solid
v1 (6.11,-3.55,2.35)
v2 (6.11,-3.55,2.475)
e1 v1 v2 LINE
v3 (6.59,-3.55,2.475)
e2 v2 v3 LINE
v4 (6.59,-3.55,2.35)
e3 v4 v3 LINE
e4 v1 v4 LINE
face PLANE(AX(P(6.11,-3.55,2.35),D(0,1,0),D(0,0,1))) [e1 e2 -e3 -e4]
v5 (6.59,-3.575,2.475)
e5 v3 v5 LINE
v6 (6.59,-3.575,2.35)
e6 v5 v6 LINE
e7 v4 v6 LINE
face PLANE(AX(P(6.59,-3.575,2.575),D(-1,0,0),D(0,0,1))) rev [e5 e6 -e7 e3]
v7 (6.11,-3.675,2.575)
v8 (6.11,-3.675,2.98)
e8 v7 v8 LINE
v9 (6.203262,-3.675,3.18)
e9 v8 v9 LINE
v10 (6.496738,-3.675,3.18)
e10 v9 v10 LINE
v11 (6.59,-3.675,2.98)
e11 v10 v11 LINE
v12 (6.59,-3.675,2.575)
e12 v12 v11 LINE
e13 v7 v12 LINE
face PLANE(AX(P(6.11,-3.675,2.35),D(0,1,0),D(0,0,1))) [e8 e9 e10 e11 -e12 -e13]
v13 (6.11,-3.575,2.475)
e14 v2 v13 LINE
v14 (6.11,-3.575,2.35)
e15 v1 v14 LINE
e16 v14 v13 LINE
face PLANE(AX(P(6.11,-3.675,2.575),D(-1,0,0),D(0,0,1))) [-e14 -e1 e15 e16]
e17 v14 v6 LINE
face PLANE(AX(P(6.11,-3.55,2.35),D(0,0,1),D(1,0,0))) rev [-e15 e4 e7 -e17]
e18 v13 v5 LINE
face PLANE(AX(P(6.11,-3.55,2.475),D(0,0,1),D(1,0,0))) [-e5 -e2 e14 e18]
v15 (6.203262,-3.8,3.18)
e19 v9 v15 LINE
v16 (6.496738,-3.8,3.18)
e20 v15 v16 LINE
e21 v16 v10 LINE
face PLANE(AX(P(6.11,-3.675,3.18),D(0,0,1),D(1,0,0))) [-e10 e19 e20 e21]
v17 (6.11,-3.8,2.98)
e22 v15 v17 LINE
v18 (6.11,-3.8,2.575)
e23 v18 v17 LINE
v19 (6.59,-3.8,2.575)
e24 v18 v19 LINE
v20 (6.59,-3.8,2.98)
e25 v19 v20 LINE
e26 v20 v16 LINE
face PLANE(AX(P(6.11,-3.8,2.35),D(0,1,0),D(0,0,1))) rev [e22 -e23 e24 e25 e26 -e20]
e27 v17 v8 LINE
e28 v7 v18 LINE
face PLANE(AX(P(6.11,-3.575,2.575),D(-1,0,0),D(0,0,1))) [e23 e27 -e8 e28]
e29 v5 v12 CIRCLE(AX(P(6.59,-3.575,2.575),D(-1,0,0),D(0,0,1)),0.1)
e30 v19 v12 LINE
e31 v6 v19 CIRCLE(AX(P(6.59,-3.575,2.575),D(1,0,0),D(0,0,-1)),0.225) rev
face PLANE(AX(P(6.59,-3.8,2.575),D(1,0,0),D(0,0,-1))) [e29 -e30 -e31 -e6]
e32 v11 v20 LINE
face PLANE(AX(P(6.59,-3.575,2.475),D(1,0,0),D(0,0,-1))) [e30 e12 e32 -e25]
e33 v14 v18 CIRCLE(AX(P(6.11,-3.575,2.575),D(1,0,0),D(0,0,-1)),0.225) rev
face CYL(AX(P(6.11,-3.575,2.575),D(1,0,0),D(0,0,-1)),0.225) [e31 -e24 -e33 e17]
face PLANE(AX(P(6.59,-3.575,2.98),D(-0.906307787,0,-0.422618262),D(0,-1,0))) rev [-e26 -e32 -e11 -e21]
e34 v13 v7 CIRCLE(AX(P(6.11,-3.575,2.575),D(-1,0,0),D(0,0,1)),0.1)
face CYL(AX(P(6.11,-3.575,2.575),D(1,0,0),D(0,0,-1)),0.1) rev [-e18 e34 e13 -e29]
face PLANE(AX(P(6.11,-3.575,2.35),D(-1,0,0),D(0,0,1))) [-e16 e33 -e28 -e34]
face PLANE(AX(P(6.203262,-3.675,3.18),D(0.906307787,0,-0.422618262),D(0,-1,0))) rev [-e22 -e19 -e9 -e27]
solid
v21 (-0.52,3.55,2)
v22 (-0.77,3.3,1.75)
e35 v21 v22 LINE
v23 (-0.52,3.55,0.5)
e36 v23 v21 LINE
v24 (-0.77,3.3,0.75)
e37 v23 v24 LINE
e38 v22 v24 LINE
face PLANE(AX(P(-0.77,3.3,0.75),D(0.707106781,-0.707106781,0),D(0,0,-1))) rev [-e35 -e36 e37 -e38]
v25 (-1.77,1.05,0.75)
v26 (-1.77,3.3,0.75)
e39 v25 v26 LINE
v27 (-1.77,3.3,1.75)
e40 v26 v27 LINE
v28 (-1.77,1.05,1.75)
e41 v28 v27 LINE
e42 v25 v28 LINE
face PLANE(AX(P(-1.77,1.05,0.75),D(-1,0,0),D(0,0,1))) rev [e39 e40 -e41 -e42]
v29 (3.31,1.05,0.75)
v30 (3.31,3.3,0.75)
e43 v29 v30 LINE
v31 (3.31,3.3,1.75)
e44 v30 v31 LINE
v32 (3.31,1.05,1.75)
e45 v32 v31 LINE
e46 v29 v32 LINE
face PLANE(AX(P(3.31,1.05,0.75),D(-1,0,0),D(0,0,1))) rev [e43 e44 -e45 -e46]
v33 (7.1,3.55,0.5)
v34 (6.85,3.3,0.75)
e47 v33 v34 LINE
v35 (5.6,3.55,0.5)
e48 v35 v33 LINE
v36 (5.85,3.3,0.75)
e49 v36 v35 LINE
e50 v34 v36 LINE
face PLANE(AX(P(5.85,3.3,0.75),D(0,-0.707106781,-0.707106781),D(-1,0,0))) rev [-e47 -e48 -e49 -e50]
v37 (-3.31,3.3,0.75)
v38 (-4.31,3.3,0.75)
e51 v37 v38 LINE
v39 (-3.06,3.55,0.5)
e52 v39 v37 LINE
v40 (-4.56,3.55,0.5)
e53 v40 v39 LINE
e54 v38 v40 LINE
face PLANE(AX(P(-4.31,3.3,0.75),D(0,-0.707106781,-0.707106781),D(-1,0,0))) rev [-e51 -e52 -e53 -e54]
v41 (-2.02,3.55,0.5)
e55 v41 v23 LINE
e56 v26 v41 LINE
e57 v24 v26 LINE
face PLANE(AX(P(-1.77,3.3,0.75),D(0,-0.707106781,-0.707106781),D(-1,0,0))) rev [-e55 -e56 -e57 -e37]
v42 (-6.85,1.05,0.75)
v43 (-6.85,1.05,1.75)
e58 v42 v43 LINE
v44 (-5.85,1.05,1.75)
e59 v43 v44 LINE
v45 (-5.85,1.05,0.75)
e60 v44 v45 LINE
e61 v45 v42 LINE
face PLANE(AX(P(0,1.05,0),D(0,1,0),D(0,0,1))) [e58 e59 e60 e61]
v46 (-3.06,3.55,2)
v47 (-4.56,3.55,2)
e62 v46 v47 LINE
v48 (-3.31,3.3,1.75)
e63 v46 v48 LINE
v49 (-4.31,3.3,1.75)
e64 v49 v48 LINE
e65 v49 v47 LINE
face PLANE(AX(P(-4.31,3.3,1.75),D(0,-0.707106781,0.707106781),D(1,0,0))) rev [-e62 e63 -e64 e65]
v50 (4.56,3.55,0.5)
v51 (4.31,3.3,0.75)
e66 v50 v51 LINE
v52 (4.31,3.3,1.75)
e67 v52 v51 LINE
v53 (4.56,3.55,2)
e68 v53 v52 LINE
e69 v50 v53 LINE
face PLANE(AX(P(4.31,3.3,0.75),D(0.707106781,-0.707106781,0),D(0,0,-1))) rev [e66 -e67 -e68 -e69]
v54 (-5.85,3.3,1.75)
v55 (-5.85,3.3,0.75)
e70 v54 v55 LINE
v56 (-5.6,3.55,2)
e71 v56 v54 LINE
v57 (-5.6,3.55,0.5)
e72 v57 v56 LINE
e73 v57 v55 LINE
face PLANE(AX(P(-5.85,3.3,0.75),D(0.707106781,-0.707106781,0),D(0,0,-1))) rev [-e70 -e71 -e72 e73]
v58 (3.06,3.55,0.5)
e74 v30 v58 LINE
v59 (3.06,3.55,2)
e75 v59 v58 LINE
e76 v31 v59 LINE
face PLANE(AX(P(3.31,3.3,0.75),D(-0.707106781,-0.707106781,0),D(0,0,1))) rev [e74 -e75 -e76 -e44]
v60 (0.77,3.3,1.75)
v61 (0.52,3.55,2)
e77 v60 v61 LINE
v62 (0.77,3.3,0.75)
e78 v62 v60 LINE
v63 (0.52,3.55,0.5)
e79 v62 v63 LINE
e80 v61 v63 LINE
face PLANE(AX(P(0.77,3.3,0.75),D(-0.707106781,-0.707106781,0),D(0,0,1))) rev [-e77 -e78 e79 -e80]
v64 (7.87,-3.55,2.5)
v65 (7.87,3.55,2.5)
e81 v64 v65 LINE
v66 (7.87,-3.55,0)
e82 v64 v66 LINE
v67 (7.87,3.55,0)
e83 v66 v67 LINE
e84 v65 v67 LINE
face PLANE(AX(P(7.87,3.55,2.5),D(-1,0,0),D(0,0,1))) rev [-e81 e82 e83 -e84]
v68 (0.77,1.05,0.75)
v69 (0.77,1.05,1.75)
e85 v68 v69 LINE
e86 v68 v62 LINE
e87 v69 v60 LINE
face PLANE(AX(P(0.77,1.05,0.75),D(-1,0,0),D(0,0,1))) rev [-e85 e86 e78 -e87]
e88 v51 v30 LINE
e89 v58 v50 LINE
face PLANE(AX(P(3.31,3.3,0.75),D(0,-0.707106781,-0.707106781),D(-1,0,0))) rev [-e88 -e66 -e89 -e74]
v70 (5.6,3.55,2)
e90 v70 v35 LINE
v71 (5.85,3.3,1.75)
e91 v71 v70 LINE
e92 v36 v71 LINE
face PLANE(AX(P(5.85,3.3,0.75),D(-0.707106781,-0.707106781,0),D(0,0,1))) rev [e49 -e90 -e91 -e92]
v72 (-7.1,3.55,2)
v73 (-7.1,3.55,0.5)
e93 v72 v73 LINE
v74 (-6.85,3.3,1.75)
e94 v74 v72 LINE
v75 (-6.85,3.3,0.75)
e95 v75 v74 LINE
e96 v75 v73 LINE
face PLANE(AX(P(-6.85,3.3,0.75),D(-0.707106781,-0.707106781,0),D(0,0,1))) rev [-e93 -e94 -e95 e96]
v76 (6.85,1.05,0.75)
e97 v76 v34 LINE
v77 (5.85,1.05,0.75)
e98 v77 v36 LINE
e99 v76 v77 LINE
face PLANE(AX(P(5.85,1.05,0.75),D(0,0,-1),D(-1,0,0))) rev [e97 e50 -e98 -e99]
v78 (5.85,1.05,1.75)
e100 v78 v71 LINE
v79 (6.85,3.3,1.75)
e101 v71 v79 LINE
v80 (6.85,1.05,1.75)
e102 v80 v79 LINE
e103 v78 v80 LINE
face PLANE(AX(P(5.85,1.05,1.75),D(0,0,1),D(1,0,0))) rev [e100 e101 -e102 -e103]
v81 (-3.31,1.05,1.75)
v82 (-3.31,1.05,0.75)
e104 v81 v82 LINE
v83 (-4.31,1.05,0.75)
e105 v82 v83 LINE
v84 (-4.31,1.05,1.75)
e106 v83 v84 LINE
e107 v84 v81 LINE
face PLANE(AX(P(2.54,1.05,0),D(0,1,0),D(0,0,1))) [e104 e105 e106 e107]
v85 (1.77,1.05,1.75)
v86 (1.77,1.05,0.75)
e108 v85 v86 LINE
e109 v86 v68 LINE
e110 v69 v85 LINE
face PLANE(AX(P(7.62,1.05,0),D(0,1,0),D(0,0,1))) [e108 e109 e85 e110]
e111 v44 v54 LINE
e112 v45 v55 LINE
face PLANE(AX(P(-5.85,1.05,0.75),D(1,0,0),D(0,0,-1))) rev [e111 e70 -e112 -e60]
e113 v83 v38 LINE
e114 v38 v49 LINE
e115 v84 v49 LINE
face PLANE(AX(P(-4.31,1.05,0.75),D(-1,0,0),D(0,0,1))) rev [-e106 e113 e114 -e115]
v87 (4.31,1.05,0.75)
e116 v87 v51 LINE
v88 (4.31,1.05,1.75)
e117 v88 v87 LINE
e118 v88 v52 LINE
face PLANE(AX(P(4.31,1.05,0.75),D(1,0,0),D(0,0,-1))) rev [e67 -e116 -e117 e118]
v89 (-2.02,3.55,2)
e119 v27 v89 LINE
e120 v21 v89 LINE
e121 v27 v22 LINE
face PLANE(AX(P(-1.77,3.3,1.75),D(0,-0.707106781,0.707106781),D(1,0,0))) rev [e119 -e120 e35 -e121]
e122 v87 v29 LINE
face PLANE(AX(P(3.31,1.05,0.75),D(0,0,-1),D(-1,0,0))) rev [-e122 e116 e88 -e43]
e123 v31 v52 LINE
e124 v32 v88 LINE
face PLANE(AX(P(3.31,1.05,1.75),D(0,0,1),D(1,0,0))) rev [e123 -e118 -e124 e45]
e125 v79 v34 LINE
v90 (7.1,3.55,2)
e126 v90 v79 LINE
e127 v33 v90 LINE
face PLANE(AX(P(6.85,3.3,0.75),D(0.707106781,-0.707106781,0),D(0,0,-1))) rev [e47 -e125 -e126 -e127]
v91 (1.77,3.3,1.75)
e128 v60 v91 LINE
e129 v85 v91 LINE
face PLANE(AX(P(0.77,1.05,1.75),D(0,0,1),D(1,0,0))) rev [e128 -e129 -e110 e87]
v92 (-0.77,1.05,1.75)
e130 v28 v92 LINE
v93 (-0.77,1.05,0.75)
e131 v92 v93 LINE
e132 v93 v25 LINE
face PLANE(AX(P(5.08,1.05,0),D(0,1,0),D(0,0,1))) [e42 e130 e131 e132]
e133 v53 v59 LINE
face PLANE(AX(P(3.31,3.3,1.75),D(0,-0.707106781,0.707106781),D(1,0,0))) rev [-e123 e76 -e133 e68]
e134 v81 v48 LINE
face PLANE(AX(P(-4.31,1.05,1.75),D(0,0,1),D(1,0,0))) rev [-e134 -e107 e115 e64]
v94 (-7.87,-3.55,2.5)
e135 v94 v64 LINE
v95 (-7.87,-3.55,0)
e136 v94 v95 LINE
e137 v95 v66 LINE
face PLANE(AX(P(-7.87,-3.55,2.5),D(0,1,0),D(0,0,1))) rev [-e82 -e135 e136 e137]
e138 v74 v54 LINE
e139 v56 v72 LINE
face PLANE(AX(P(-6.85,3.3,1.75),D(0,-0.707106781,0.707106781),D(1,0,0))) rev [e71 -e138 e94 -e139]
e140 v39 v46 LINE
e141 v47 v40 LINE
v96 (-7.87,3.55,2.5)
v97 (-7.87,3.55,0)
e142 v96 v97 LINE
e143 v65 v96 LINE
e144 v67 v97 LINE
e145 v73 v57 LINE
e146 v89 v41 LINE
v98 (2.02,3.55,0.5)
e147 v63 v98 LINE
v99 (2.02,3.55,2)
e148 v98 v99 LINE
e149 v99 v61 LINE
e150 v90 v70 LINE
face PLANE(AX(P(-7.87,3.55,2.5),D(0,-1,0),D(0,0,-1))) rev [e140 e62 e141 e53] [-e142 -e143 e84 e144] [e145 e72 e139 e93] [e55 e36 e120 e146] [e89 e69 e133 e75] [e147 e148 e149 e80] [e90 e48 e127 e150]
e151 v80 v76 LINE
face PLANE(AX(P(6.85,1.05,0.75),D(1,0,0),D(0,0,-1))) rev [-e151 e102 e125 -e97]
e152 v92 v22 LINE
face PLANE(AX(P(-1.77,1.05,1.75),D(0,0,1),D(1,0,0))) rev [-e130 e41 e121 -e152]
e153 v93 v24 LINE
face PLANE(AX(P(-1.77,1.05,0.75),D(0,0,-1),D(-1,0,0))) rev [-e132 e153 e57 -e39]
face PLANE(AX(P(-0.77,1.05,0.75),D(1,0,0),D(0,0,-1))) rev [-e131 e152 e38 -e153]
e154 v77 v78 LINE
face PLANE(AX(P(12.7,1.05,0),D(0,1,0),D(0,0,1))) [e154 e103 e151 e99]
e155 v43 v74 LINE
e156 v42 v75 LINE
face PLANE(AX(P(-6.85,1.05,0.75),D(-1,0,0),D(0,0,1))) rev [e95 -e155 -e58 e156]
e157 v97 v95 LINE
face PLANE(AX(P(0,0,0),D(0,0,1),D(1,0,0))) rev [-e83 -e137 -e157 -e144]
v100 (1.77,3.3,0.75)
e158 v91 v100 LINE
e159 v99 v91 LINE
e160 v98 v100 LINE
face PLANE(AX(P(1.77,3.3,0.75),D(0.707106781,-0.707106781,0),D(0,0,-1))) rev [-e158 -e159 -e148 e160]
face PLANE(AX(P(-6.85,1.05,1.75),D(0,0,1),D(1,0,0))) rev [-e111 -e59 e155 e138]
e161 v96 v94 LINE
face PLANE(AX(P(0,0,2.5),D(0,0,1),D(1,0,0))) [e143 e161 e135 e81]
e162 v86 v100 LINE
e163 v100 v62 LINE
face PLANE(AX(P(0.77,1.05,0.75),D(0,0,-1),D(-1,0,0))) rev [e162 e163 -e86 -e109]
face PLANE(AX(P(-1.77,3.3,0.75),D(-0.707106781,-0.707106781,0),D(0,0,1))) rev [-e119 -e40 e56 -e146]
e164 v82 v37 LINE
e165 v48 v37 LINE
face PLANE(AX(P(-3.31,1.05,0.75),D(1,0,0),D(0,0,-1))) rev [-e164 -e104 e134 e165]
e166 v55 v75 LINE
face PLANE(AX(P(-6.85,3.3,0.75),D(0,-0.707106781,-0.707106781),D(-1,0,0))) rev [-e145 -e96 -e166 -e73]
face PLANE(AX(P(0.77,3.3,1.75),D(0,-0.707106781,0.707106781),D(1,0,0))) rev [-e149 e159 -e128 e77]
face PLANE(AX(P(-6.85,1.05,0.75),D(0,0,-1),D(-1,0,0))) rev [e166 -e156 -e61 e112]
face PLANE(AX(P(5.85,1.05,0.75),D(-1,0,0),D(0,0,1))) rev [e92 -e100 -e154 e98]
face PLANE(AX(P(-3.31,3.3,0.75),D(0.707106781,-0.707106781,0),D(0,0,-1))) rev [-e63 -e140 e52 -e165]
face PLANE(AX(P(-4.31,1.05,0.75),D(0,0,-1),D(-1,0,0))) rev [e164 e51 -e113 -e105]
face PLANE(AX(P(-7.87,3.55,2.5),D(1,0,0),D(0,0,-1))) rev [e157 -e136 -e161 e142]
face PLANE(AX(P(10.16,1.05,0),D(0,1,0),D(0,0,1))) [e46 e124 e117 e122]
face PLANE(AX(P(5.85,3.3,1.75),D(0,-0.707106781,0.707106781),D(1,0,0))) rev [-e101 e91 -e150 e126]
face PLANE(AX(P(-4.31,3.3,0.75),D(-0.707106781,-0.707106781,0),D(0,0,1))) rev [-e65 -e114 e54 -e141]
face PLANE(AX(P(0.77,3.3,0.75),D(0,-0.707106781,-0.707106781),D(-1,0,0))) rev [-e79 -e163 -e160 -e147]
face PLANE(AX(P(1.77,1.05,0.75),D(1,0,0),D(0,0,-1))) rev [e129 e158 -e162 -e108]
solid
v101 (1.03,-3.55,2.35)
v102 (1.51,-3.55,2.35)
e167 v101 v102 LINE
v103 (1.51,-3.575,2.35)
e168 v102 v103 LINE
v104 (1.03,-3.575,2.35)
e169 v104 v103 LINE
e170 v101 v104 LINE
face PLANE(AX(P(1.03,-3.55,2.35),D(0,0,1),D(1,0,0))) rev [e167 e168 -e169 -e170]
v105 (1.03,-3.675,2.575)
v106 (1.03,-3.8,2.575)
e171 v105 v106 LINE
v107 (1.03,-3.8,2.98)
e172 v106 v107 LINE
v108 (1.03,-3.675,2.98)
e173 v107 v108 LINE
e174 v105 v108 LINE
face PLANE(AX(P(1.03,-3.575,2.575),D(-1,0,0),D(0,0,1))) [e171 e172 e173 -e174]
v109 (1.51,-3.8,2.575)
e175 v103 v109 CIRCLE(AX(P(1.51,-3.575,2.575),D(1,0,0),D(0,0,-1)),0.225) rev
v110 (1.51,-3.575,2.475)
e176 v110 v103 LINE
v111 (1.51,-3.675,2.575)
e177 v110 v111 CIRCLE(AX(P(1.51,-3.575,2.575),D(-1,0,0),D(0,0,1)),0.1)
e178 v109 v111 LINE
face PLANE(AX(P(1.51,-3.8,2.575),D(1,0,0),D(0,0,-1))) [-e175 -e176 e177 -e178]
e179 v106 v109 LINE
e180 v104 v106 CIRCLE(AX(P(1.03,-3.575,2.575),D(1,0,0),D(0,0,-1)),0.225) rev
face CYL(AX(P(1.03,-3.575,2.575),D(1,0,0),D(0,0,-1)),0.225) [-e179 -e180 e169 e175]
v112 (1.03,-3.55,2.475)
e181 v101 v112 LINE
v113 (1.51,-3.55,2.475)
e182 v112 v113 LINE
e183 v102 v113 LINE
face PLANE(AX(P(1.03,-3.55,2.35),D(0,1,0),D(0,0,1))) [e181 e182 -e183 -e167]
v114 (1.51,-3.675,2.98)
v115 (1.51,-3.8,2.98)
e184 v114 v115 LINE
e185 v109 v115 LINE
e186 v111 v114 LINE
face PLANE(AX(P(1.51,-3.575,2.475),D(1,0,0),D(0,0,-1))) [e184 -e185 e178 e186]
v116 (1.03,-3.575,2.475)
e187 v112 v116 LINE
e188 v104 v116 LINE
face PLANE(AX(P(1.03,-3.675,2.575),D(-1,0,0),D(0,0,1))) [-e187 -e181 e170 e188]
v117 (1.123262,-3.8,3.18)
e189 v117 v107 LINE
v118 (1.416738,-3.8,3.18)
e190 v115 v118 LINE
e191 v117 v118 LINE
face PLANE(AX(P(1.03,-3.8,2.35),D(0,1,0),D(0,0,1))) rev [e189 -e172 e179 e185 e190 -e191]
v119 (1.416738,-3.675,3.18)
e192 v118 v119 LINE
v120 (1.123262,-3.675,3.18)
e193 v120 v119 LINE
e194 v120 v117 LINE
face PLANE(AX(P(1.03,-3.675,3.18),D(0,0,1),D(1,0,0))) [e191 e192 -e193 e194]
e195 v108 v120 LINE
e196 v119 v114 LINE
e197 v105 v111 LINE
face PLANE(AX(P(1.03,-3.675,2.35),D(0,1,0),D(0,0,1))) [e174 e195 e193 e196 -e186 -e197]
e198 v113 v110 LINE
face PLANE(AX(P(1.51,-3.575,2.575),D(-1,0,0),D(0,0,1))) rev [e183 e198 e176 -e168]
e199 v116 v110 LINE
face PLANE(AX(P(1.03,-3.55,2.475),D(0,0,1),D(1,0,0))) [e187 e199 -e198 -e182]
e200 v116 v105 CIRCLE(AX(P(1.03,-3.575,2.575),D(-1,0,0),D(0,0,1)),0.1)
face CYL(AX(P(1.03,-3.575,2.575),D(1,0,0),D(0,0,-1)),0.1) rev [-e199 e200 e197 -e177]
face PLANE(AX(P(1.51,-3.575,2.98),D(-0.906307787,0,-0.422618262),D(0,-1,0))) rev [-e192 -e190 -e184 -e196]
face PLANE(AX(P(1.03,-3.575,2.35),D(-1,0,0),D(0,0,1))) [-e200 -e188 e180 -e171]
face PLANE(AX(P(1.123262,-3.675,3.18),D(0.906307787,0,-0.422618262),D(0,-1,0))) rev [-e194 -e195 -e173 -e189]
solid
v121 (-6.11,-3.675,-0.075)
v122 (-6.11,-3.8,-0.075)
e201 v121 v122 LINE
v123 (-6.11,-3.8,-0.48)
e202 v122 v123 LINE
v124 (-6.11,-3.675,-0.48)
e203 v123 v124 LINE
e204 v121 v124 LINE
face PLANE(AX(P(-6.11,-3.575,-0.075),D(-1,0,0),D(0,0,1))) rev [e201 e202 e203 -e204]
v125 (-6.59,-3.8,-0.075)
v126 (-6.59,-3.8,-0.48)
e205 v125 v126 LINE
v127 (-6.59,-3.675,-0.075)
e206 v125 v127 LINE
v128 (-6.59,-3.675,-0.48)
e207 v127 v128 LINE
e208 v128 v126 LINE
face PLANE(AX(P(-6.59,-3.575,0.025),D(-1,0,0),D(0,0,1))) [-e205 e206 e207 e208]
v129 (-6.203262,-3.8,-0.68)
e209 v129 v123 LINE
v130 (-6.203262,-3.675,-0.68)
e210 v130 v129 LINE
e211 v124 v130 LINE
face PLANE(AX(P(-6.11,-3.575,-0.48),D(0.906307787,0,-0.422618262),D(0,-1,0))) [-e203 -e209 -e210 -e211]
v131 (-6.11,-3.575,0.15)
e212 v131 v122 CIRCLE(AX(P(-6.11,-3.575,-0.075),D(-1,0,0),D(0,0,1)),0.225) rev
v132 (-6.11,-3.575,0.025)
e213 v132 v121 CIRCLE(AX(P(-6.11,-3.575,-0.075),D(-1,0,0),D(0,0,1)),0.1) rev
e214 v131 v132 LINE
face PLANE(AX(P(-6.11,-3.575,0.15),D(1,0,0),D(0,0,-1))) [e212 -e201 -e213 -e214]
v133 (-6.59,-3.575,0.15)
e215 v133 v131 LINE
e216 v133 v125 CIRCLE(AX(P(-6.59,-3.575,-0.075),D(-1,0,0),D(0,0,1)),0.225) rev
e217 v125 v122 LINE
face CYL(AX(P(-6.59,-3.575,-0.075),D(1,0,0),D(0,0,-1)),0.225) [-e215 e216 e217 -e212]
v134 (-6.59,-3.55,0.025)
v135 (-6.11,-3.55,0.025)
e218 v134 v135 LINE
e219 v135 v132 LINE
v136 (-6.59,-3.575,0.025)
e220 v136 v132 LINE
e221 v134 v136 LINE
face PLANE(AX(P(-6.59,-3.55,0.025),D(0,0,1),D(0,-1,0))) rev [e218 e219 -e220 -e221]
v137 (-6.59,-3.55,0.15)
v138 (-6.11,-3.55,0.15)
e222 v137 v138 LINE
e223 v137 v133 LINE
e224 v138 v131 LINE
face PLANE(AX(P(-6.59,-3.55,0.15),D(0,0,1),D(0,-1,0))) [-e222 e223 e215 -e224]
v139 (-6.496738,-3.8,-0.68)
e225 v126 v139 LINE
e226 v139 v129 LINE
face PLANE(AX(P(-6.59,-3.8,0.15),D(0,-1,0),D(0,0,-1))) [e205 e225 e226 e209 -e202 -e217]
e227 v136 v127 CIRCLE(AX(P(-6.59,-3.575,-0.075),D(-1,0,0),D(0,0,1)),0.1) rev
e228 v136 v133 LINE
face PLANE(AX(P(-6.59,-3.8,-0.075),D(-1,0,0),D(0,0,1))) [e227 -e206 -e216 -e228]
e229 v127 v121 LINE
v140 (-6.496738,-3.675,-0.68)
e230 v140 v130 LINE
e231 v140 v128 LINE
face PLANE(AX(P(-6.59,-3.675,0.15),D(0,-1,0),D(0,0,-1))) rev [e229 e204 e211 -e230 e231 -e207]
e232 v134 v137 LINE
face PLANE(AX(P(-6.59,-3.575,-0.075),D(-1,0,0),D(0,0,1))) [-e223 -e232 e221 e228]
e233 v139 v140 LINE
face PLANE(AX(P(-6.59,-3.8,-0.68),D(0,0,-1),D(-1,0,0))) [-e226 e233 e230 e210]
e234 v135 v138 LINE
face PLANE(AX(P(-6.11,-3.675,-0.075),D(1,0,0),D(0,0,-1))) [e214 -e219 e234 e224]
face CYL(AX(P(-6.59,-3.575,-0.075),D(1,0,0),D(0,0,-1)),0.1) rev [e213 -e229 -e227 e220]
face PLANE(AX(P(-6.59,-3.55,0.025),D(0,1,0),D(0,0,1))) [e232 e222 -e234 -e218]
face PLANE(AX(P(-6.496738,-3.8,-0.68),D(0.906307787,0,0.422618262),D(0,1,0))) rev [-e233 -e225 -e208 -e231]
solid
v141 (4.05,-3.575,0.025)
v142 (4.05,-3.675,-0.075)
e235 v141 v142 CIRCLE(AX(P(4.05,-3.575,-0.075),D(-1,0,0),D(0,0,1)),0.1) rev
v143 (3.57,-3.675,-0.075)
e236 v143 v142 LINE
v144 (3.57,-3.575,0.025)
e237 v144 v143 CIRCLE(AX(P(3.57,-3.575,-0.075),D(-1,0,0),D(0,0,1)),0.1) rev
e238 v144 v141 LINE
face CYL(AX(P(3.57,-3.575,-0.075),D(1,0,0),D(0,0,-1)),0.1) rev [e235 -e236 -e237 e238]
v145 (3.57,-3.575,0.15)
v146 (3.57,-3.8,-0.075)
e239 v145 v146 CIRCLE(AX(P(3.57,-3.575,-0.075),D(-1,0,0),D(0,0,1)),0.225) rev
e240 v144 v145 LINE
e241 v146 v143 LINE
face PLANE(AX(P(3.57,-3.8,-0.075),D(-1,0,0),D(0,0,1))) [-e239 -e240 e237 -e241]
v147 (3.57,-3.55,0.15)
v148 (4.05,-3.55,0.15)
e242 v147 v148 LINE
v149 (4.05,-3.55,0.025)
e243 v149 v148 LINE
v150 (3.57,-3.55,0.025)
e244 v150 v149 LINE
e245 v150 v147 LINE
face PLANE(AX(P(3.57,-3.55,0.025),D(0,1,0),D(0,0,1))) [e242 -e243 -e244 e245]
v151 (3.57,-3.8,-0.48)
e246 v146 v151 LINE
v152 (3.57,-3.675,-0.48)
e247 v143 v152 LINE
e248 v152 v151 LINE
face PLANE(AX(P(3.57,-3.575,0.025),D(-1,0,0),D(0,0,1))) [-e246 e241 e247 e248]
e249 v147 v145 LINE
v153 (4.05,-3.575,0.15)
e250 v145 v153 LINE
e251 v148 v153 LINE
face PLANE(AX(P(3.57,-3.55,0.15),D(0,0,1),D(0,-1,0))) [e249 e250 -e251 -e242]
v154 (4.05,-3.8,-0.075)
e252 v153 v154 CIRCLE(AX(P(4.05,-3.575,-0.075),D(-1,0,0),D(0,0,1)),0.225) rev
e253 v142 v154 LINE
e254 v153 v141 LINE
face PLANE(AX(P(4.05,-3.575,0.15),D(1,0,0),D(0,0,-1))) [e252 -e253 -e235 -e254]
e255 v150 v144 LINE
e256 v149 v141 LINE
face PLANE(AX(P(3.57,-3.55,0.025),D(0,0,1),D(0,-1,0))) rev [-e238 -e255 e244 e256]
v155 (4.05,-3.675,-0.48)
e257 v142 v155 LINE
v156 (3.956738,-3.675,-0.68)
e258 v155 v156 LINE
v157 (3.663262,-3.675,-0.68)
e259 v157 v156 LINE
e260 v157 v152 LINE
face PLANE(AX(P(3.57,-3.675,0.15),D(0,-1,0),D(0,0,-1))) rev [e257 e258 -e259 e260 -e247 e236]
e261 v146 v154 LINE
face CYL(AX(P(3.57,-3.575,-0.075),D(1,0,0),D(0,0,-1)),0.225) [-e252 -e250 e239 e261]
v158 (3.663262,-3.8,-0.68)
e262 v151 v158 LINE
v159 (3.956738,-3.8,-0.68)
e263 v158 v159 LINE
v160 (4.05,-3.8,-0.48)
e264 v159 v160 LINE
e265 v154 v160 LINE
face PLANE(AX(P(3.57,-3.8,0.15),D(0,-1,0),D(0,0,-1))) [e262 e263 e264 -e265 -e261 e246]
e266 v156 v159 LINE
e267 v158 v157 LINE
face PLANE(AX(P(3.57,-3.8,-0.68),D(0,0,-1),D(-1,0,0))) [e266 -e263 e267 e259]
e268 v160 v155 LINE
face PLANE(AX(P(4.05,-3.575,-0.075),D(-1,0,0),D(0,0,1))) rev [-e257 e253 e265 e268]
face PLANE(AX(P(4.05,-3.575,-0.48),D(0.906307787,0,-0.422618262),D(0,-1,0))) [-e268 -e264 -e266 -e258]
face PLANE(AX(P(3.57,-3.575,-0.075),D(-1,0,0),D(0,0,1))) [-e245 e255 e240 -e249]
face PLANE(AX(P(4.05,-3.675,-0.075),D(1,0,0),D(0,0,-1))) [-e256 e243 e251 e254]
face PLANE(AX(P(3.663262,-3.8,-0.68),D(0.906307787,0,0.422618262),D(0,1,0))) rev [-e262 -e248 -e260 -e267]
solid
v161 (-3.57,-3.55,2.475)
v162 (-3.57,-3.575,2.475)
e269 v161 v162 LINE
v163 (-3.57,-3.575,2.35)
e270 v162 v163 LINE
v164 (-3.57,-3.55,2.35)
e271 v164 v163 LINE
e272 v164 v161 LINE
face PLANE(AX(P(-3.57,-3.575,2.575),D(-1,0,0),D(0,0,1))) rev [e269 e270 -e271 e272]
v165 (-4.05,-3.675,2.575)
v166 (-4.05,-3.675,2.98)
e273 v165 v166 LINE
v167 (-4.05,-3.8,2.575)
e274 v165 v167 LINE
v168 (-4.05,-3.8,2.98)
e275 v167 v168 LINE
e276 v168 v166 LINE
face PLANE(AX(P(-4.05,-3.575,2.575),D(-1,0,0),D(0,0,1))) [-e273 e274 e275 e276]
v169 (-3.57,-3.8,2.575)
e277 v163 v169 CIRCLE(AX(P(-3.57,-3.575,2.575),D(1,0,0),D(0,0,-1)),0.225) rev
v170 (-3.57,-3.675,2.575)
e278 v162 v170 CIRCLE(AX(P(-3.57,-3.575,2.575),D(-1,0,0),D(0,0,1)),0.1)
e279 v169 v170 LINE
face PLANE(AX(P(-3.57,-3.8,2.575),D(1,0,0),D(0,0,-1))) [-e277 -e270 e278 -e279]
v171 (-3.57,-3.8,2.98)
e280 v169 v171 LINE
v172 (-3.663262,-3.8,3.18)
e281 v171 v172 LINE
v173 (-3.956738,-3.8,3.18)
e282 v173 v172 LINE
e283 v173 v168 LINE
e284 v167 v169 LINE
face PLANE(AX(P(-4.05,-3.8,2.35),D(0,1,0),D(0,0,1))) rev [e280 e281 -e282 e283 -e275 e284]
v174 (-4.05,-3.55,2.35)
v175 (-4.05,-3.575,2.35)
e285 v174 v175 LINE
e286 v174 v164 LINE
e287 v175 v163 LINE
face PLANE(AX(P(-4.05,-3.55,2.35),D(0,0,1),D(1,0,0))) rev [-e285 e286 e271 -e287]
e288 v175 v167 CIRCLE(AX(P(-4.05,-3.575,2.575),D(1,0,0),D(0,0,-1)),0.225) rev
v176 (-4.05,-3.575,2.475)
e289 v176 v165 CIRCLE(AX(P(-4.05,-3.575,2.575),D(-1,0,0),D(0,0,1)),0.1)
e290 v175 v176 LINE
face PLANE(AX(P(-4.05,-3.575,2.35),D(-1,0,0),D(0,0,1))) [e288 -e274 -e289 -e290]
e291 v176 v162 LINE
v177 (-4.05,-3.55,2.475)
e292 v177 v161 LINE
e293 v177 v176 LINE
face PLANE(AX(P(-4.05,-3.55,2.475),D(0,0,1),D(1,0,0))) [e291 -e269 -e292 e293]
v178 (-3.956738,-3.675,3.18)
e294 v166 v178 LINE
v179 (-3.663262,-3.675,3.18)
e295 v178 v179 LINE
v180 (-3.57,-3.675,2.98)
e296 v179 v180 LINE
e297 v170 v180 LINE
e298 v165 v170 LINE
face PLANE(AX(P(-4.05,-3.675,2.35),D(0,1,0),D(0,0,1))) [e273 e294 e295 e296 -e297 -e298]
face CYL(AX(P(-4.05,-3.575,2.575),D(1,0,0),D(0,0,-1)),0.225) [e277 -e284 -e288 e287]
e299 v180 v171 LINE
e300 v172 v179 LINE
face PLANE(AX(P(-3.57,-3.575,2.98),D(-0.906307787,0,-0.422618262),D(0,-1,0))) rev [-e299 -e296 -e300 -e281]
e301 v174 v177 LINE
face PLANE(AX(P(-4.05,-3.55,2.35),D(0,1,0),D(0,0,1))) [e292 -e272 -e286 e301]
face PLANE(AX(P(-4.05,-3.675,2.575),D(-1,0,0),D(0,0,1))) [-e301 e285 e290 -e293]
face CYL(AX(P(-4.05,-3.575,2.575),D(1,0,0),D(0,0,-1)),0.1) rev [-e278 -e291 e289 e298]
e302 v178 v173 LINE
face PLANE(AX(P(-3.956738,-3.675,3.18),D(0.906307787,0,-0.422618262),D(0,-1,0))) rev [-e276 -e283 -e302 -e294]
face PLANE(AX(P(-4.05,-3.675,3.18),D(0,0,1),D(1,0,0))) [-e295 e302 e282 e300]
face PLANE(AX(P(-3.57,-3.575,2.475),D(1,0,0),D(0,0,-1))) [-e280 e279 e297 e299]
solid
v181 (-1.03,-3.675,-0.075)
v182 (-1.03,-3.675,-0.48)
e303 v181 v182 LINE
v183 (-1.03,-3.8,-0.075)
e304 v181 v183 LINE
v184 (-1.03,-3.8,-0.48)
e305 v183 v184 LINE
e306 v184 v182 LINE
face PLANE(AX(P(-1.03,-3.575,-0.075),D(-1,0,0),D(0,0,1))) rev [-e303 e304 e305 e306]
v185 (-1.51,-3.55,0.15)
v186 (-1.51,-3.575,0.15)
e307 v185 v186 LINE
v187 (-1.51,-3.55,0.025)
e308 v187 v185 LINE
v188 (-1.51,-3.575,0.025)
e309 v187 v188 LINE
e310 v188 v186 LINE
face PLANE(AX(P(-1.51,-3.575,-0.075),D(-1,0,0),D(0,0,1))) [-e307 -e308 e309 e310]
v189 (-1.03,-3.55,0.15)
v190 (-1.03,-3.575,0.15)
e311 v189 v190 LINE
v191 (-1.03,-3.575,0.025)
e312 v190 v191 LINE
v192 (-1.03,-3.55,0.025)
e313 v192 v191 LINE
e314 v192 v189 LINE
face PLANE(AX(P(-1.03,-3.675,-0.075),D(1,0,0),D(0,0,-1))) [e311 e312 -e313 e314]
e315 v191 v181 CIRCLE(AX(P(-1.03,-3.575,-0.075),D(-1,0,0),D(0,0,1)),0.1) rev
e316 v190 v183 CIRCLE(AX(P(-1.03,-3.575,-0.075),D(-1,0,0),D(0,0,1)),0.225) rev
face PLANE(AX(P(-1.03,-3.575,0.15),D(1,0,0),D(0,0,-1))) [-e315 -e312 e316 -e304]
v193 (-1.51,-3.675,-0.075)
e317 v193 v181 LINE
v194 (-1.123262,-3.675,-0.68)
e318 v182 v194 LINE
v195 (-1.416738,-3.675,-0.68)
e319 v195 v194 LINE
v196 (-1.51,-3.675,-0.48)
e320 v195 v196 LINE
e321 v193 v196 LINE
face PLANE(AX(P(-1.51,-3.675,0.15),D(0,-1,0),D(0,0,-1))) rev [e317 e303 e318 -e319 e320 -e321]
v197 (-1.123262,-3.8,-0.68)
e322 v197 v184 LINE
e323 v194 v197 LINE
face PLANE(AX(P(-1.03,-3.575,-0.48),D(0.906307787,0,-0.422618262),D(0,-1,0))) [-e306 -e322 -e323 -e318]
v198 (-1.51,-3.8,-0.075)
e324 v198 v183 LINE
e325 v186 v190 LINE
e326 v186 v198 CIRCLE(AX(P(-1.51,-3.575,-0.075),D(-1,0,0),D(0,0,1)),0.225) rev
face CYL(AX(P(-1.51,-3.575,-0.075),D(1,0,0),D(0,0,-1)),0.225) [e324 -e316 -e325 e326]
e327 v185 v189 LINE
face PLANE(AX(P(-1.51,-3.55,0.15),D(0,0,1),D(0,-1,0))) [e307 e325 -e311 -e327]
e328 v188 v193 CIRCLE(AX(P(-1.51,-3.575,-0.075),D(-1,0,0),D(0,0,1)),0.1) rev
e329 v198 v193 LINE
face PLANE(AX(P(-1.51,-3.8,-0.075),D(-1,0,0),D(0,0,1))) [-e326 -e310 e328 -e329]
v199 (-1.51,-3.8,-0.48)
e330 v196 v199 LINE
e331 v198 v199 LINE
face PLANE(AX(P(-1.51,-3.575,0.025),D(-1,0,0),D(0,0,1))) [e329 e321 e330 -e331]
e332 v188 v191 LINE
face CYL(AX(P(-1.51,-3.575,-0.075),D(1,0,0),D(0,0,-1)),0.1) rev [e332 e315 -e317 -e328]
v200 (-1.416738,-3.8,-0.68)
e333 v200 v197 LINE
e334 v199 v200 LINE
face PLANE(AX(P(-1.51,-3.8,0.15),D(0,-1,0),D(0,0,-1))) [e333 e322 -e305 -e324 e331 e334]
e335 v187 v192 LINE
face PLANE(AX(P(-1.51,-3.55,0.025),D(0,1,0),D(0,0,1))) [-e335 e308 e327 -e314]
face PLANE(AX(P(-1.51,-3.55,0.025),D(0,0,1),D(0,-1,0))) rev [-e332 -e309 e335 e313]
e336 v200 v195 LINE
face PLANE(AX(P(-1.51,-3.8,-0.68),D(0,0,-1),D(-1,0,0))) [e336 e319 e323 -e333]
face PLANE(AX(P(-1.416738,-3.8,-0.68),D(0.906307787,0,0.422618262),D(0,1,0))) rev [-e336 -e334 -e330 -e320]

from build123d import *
from OCP.BRepFilletAPI import BRepFilletAPI_MakeChamfer

# Parameters (mm, degrees)
SKETCH1_W                  = 15.74
SKETCH1_H                  = 7.1
BOSS_EXTRUDE1_DEPTH        = 2.5
SKETCH2_W                  = 1
SKETCH2_H                  = 1
CUT_EXTRUDE1_DEPTH         = 2.5
CHAMFER1_SIZE              = 0.25
LPATTERN6_COUNT            = 6
LPATTERN6_PITCH            = 2.54
CHAMFER1_OF_LPATTERN6_SIZE = 0.25
BASE_FLANGE2_DEPTH         = 0.24
BASE_FLANGE2_DEPTH_BACK    = 0.24
BASE_FLANGE3_DEPTH         = 0.24
BASE_FLANGE3_DEPTH_BACK    = 0.24
CHAMFER3_SIZE              = 0.2
CHAMFER3_SIZE2             = 0.093261532
CHAMFER4_SIZE              = 0.2
CHAMFER4_SIZE2             = 0.093261532
LPATTERN4_COUNT            = 3
LPATTERN4_PITCH            = 5.08
LPATTERN3_COUNT            = 3
LPATTERN3_PITCH            = 5.08


# Sheet-metal steps are written as plain solids
with BuildPart() as part:
    # Sketch1 → Boss-Extrude1 (new body)
    with BuildSketch(Plane.XY):
        Rectangle(SKETCH1_W, SKETCH1_H)
    extrude(amount=BOSS_EXTRUDE1_DEPTH)

    # Sketch2 → Cut-Extrude1 (cut)
    with BuildSketch(Plane(origin=(0, 3.55, 0), x_dir=(1, 0, 0), z_dir=(0, 1, 0))):
        with Locations((-6.35, -1.25)):
            Rectangle(SKETCH2_W, SKETCH2_H)
    cut_extrude1 = extrude(amount=-CUT_EXTRUDE1_DEPTH, mode=Mode.SUBTRACT)

    # Chamfer1
    chamfer1_edges = [part.edges().sort_by_distance(p)[0] for p in [
        (-5.85, 3.55, 1.25),
        (-6.35, 3.55, 0.75),
        (-6.85, 3.55, 1.25),
        (-6.35, 3.55, 1.75),
    ]]
    chamfer(chamfer1_edges, length=CHAMFER1_SIZE)

    # LPattern6: Cut-Extrude1 ×6
    with Locations(*[(i * LPATTERN6_PITCH, 0, 0) for i in range(1, LPATTERN6_COUNT)]):
        add(cut_extrude1, mode=Mode.SUBTRACT)

    # Chamfer1 of LPattern6
    chamfer1_of_lpattern6_edges = [part.edges().sort_by_distance(p)[0] for p in [
        (-3.31, 3.55, 1.25),
        (-3.81, 3.55, 0.75),
        (-4.31, 3.55, 1.25),
        (-3.81, 3.55, 1.75),
        (-0.77, 3.55, 1.25),
        (-1.27, 3.55, 0.75),
        (-1.77, 3.55, 1.25),
        (-1.27, 3.55, 1.75),
        (1.77, 3.55, 1.25),
        (1.27, 3.55, 0.75),
        (0.77, 3.55, 1.25),
        (1.27, 3.55, 1.75),
        (4.31, 3.55, 1.25),
        (3.81, 3.55, 0.75),
        (3.31, 3.55, 1.25),
        (3.81, 3.55, 1.75),
        (6.85, 3.55, 1.25),
        (6.35, 3.55, 0.75),
        (5.85, 3.55, 1.25),
        (6.35, 3.55, 1.75),
    ]]
    chamfer(chamfer1_of_lpattern6_edges, length=CHAMFER1_OF_LPATTERN6_SIZE)


with BuildPart() as body_2:
    # Sketch5 → Base-Flange2 (new, two sides: drawn at the far end of the back side and taken through both)
    with BuildSketch(Plane.ZY.offset(6.35).offset(-BASE_FLANGE2_DEPTH_BACK)):
        with BuildLine():
            Line((0.15, -3.55), (0.15, -3.575))
            ThreePointArc((0.15, -3.575), (0.084099026, -3.734099026), (-0.075, -3.8))
            Line((-0.075, -3.8), (-0.68, -3.8))
            Line((-0.68, -3.8), (-0.68, -3.675))
            Line((-0.68, -3.675), (-0.075, -3.675))
            ThreePointArc((-0.075, -3.675), (-0.004289322, -3.645710678), (0.025, -3.575))
            Line((0.025, -3.575), (0.025, -3.55))
            Line((0.025, -3.55), (0.15, -3.55))
        make_face()
    extrude(amount=BASE_FLANGE2_DEPTH + BASE_FLANGE2_DEPTH_BACK)

    # Chamfer4: one chamfer whose edges measure the first distance from different faces: ONE call of the kernel's chamfer builder (chamfer() names one face for all edges)
    chamfer4_edges_1 = [body_2.edges().sort_by_distance(p)[0] for p in [
        (-6.11, -3.7375, -0.68),
    ]]
    chamfer4_side_1 = [body_2.faces().sort_by_distance(p)[0] for p in [
        (-6.11, -3.717002494, -0.245845427),
    ]]
    chamfer4_edges_2 = [body_2.edges().sort_by_distance(p)[0] for p in [
        (-6.59, -3.7375, -0.68),
    ]]
    chamfer4_side_2 = [body_2.faces().sort_by_distance(p)[0] for p in [
        (-6.59, -3.717002494, -0.245845427),
    ]]
    chamfer4 = BRepFilletAPI_MakeChamfer(body_2.part.solid().wrapped)
    for e in chamfer4_edges_1:
        chamfer4.Add(CHAMFER4_SIZE, CHAMFER4_SIZE2, e.wrapped, chamfer4_side_1[0].wrapped)  # the first distance lies on this face
    for e in chamfer4_edges_2:
        chamfer4.Add(CHAMFER4_SIZE, CHAMFER4_SIZE2, e.wrapped, chamfer4_side_2[0].wrapped)  # the first distance lies on this face
    add(Compound.cast(chamfer4.Shape()), mode=Mode.REPLACE)


with BuildPart() as body_3:
    # Sketch22 → Base-Flange3 (new, two sides: drawn at the far end of the back side and taken through both)
    with BuildSketch(Plane.ZY.offset(3.81).offset(-BASE_FLANGE3_DEPTH_BACK)):
        with BuildLine():
            Line((2.35, -3.55), (2.35, -3.575))
            ThreePointArc((2.35, -3.575), (2.415900974, -3.734099026), (2.575, -3.8))
            Line((2.575, -3.8), (3.18, -3.8))
            Line((3.18, -3.8), (3.18, -3.675))
            Line((3.18, -3.675), (2.575, -3.675))
            ThreePointArc((2.575, -3.675), (2.504289322, -3.645710678), (2.475, -3.575))
            Line((2.475, -3.575), (2.475, -3.55))
            Line((2.475, -3.55), (2.35, -3.55))
        make_face()
    extrude(amount=BASE_FLANGE3_DEPTH + BASE_FLANGE3_DEPTH_BACK)

    # Chamfer3: one chamfer whose edges measure the first distance from different faces: ONE call of the kernel's chamfer builder (chamfer() names one face for all edges)
    chamfer3_edges_1 = [body_3.edges().sort_by_distance(p)[0] for p in [
        (-3.57, -3.7375, 3.18),
    ]]
    chamfer3_side_1 = [body_3.faces().sort_by_distance(p)[0] for p in [
        (-3.57, -3.717002494, 2.745845427),
    ]]
    chamfer3_edges_2 = [body_3.edges().sort_by_distance(p)[0] for p in [
        (-4.05, -3.7375, 3.18),
    ]]
    chamfer3_side_2 = [body_3.faces().sort_by_distance(p)[0] for p in [
        (-4.05, -3.717002494, 2.745845427),
    ]]
    chamfer3 = BRepFilletAPI_MakeChamfer(body_3.part.solid().wrapped)
    for e in chamfer3_edges_1:
        chamfer3.Add(CHAMFER3_SIZE, CHAMFER3_SIZE2, e.wrapped, chamfer3_side_1[0].wrapped)  # the first distance lies on this face
    for e in chamfer3_edges_2:
        chamfer3.Add(CHAMFER3_SIZE, CHAMFER3_SIZE2, e.wrapped, chamfer3_side_2[0].wrapped)  # the first distance lies on this face
    add(Compound.cast(chamfer3.Shape()), mode=Mode.REPLACE)


with BuildPart() as lpattern4_1:
    # LPattern4: pattern copy
    add(body_2.part.moved(Location(Vector(1, 0, 0) * (1 * LPATTERN4_PITCH))))


with BuildPart() as lpattern4_2:
    # LPattern4: pattern copy
    add(body_2.part.moved(Location(Vector(1, 0, 0) * (2 * LPATTERN4_PITCH))))


with BuildPart() as lpattern3_1:
    # LPattern3: pattern copy
    add(body_3.part.moved(Location(Vector(1, 0, 0) * (1 * LPATTERN3_PITCH))))


with BuildPart() as lpattern3_2:
    # LPattern3: pattern copy
    add(body_3.part.moved(Location(Vector(1, 0, 0) * (2 * LPATTERN3_PITCH))))


solid = Compound([part.part, body_2.part, body_3.part, lpattern4_1.part, lpattern4_2.part, lpattern3_1.part, lpattern3_2.part])
